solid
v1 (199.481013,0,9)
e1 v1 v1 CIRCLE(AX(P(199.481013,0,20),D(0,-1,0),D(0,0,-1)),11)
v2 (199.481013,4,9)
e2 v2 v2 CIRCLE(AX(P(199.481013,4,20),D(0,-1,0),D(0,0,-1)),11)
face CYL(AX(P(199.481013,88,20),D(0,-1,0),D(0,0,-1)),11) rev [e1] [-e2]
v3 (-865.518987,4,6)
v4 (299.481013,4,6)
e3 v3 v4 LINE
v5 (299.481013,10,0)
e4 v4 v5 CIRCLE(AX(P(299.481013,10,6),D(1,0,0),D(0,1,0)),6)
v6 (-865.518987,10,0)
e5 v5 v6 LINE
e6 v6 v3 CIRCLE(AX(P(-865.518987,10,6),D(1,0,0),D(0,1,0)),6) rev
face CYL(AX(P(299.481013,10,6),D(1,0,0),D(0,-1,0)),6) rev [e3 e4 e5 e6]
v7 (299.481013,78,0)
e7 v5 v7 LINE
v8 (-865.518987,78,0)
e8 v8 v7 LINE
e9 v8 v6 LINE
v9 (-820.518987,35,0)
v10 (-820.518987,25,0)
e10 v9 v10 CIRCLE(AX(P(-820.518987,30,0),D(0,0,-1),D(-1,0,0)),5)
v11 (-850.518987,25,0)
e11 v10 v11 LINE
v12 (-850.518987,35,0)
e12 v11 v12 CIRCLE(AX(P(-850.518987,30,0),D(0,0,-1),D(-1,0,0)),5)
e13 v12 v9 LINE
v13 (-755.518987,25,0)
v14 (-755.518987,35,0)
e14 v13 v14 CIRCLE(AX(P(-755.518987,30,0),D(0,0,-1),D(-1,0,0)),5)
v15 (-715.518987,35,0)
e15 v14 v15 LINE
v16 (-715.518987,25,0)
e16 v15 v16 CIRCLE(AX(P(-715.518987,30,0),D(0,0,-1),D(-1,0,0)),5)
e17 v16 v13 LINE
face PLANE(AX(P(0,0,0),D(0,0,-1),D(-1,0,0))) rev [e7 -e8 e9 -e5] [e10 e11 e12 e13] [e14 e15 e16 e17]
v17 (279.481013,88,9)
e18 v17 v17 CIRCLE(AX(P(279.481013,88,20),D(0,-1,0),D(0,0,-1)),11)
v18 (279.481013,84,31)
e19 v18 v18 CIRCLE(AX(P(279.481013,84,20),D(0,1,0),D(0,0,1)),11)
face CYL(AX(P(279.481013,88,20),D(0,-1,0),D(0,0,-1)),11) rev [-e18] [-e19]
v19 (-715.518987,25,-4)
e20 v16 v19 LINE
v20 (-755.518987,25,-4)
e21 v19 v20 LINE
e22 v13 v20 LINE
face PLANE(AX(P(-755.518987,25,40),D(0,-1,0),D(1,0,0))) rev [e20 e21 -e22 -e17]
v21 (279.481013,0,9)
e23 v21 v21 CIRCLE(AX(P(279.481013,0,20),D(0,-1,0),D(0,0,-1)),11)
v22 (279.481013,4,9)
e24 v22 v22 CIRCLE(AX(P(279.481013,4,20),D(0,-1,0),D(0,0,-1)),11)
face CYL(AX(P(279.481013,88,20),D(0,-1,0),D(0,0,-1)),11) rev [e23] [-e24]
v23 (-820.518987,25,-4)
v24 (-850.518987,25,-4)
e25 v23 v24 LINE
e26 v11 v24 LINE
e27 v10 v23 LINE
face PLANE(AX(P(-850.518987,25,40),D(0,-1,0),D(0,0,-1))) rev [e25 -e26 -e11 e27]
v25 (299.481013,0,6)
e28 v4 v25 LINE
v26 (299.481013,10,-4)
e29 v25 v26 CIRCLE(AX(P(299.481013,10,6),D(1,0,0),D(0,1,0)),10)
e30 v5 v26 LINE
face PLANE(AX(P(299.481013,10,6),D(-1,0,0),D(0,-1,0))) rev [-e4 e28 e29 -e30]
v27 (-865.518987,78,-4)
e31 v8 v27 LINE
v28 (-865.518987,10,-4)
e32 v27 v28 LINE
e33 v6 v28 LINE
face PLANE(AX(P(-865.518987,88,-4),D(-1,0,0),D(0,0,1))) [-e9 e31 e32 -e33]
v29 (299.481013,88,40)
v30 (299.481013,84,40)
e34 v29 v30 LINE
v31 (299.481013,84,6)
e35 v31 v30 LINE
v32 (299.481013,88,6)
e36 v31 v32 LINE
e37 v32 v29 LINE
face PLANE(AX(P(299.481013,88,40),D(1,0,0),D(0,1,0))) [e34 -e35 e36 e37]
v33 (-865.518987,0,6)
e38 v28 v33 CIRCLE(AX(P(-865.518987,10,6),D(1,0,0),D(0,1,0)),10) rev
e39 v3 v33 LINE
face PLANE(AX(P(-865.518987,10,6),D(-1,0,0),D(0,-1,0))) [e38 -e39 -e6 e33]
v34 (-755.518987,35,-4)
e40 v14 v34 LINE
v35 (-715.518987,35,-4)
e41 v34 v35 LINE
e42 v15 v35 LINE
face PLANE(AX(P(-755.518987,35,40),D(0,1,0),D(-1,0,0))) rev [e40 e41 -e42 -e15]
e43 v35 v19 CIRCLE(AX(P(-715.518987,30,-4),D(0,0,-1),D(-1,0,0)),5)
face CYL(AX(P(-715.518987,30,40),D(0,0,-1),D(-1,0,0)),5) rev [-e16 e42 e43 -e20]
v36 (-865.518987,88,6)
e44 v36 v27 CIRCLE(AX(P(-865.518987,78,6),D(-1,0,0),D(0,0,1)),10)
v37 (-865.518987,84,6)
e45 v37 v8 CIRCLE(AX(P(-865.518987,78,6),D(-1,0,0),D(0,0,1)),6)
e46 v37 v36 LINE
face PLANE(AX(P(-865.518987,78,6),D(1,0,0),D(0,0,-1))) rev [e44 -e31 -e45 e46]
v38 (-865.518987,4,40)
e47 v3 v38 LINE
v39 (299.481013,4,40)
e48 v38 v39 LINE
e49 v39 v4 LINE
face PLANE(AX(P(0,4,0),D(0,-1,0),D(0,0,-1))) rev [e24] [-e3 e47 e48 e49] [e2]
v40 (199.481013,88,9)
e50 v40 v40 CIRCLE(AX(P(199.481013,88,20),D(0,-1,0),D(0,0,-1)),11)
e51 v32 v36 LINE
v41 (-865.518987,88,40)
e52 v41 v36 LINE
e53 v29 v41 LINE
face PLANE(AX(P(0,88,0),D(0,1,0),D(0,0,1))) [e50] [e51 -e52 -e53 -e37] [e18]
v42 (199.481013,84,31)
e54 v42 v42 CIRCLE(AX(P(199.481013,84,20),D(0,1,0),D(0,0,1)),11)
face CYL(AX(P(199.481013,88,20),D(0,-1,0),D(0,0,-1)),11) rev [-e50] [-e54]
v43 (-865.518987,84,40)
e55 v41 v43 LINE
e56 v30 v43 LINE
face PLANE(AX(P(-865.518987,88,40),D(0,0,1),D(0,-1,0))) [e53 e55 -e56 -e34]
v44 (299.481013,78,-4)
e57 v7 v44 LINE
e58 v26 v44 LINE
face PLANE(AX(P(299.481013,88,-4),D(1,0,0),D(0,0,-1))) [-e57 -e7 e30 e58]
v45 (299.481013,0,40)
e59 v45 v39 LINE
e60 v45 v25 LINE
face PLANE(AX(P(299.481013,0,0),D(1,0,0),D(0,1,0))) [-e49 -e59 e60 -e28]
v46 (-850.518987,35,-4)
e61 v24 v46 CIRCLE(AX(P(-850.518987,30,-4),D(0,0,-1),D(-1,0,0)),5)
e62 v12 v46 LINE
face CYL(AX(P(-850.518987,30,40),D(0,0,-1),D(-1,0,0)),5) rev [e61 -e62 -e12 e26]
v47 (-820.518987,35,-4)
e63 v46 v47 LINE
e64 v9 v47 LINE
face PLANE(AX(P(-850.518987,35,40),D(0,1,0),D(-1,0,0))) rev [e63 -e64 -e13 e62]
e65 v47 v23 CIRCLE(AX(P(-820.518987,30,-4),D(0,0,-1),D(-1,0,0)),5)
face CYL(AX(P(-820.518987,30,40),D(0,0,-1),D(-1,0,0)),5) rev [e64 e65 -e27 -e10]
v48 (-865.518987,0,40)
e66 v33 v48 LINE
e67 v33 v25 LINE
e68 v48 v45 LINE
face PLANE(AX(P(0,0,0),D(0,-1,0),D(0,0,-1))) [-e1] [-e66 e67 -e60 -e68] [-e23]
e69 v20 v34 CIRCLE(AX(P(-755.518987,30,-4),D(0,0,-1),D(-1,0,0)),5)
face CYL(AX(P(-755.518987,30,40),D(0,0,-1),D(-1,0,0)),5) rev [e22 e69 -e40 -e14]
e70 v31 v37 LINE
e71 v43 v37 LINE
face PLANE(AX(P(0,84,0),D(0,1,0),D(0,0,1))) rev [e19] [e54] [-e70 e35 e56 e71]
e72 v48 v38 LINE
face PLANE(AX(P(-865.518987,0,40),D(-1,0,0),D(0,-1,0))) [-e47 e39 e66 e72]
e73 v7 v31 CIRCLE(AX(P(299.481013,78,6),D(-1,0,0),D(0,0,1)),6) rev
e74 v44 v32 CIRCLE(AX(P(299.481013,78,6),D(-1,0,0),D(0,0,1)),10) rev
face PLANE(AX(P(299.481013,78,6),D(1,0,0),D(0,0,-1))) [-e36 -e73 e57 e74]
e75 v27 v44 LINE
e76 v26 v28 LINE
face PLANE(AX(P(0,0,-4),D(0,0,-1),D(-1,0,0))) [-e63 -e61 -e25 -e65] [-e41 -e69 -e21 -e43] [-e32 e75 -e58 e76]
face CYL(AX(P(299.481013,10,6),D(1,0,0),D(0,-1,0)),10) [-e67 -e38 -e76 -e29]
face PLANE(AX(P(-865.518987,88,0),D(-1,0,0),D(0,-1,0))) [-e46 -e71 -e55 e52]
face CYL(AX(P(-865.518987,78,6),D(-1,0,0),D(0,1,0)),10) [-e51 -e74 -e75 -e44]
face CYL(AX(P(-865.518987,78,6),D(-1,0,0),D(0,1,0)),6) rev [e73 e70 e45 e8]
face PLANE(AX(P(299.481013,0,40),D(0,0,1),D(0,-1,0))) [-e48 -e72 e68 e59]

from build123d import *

# Parameters (mm, degrees)
SKETCH1_W                    = 1165
SKETCH1_H                    = 88
BASE_FLANGE1_DEPTH           = 4
EDGE_FLANGE1_STRIP_W         = 28
EDGE_FLANGE1_STRIP_H         = 4
EDGE_FLANGE1_STRIP_CUT_DEPTH = 1165
EDGE_FLANGE1_DEPTH           = 1165
EDGE_FLANGE2_STRIP_W         = 28
EDGE_FLANGE2_STRIP_H         = 4
EDGE_FLANGE2_STRIP_CUT_DEPTH = 1165
EDGE_FLANGE2_DEPTH           = 1165
CUT_EXTRUDE1_DEPTH           = 871.900176512
CUT_EXTRUDE1_DEPTH_BACK      = 871.900176512
SKETCH12_R                   = 11
CUT_EXTRUDE2_DEPTH           = 872.093059006


# Sheet-metal steps are written as plain solids
with BuildPart() as part:
    # Sketch1 → Base-Flange1 (new body)
    with BuildSketch(Plane.XY):
        with Locations((-283.018987342, 44)):
            Rectangle(SKETCH1_W, SKETCH1_H)
    extrude(amount=-BASE_FLANGE1_DEPTH)

    # Edge-Flange1 strip (across the edge) → Edge-Flange1 strip cut (cut)
    with BuildSketch(Plane(origin=(299.481012658, 88, 0), x_dir=(0, -1, 0), z_dir=(-1, 0, 0))):
        with Locations((-4, -2)):
            Rectangle(EDGE_FLANGE1_STRIP_W, EDGE_FLANGE1_STRIP_H)
    extrude(amount=EDGE_FLANGE1_STRIP_CUT_DEPTH, mode=Mode.SUBTRACT)

    # Edge-Flange1 section (across the edge) → Edge-Flange1 (add)
    with BuildSketch(Plane(origin=(299.481012658, 88, 0), x_dir=(0, -1, 0), z_dir=(-1, 0, 0))):
        with BuildLine():
            Line((0, 6), (0, 40))
            Line((0, 40), (4, 40))
            Line((4, 40), (4, 6))
            ThreePointArc((4, 6), (5.757359313, 1.757359313), (10, 0))
            Line((10, 0), (10, -4))
            ThreePointArc((10, -4), (2.928932188, -1.071067812), (0, 6))
        make_face()
    extrude(amount=EDGE_FLANGE1_DEPTH)

    # Edge-Flange2 strip (across the edge) → Edge-Flange2 strip cut (cut)
    with BuildSketch(Plane.YZ.offset(-865.518987342)):
        with Locations((-4, -2)):
            Rectangle(EDGE_FLANGE2_STRIP_W, EDGE_FLANGE2_STRIP_H)
    extrude(amount=EDGE_FLANGE2_STRIP_CUT_DEPTH, mode=Mode.SUBTRACT)

    # Edge-Flange2 section (across the edge) → Edge-Flange2 (add)
    with BuildSketch(Plane.YZ.offset(-865.518987342)):
        with BuildLine():
            Line((0, 6), (0, 40))
            Line((0, 40), (4, 40))
            Line((4, 40), (4, 6))
            ThreePointArc((4, 6), (5.757359313, 1.757359313), (10, 0))
            Line((10, 0), (10, -4))
            ThreePointArc((10, -4), (2.928932188, -1.071067812), (0, 6))
        make_face()
    extrude(amount=EDGE_FLANGE2_DEPTH)

    # Sketch12 → Cut-Extrude1 (cut, two sides: drawn at the far end of the back side and taken through both)
    with BuildSketch(Plane.XZ.offset(-CUT_EXTRUDE1_DEPTH_BACK)):
        with Locations(Location((279.481012658, 20, 0), (0, 0, 270))):
            Circle(SKETCH12_R)
        with Locations(Location((199.481012658, 20, 0), (0, 0, 270))):
            Circle(SKETCH12_R)
    extrude(amount=CUT_EXTRUDE1_DEPTH + CUT_EXTRUDE1_DEPTH_BACK, mode=Mode.SUBTRACT)

    # Sketch13 → Cut-Extrude2 (cut, through all)
    with BuildSketch(Plane(origin=(0, 0, -4), x_dir=(-1, 0, 0), z_dir=(0, 0, -1))):
        with BuildLine():
            Line((850.518987342, 25), (820.518987342, 25))
            ThreePointArc((820.518987342, 25), (815.518987342, 30), (820.518987342, 35))
            Line((820.518987342, 35), (850.518987342, 35))
            ThreePointArc((850.518987342, 35), (855.518987342, 30), (850.518987342, 25))
        make_face()
        with BuildLine():
            Line((755.518987342, 25), (715.518987342, 25))
            ThreePointArc((715.518987342, 25), (710.518987342, 30), (715.518987342, 35))
            Line((715.518987342, 35), (755.518987342, 35))
            ThreePointArc((755.518987342, 35), (760.518987342, 30), (755.518987342, 25))
        make_face()
    extrude(amount=-CUT_EXTRUDE2_DEPTH, mode=Mode.SUBTRACT)


solid = part.part
